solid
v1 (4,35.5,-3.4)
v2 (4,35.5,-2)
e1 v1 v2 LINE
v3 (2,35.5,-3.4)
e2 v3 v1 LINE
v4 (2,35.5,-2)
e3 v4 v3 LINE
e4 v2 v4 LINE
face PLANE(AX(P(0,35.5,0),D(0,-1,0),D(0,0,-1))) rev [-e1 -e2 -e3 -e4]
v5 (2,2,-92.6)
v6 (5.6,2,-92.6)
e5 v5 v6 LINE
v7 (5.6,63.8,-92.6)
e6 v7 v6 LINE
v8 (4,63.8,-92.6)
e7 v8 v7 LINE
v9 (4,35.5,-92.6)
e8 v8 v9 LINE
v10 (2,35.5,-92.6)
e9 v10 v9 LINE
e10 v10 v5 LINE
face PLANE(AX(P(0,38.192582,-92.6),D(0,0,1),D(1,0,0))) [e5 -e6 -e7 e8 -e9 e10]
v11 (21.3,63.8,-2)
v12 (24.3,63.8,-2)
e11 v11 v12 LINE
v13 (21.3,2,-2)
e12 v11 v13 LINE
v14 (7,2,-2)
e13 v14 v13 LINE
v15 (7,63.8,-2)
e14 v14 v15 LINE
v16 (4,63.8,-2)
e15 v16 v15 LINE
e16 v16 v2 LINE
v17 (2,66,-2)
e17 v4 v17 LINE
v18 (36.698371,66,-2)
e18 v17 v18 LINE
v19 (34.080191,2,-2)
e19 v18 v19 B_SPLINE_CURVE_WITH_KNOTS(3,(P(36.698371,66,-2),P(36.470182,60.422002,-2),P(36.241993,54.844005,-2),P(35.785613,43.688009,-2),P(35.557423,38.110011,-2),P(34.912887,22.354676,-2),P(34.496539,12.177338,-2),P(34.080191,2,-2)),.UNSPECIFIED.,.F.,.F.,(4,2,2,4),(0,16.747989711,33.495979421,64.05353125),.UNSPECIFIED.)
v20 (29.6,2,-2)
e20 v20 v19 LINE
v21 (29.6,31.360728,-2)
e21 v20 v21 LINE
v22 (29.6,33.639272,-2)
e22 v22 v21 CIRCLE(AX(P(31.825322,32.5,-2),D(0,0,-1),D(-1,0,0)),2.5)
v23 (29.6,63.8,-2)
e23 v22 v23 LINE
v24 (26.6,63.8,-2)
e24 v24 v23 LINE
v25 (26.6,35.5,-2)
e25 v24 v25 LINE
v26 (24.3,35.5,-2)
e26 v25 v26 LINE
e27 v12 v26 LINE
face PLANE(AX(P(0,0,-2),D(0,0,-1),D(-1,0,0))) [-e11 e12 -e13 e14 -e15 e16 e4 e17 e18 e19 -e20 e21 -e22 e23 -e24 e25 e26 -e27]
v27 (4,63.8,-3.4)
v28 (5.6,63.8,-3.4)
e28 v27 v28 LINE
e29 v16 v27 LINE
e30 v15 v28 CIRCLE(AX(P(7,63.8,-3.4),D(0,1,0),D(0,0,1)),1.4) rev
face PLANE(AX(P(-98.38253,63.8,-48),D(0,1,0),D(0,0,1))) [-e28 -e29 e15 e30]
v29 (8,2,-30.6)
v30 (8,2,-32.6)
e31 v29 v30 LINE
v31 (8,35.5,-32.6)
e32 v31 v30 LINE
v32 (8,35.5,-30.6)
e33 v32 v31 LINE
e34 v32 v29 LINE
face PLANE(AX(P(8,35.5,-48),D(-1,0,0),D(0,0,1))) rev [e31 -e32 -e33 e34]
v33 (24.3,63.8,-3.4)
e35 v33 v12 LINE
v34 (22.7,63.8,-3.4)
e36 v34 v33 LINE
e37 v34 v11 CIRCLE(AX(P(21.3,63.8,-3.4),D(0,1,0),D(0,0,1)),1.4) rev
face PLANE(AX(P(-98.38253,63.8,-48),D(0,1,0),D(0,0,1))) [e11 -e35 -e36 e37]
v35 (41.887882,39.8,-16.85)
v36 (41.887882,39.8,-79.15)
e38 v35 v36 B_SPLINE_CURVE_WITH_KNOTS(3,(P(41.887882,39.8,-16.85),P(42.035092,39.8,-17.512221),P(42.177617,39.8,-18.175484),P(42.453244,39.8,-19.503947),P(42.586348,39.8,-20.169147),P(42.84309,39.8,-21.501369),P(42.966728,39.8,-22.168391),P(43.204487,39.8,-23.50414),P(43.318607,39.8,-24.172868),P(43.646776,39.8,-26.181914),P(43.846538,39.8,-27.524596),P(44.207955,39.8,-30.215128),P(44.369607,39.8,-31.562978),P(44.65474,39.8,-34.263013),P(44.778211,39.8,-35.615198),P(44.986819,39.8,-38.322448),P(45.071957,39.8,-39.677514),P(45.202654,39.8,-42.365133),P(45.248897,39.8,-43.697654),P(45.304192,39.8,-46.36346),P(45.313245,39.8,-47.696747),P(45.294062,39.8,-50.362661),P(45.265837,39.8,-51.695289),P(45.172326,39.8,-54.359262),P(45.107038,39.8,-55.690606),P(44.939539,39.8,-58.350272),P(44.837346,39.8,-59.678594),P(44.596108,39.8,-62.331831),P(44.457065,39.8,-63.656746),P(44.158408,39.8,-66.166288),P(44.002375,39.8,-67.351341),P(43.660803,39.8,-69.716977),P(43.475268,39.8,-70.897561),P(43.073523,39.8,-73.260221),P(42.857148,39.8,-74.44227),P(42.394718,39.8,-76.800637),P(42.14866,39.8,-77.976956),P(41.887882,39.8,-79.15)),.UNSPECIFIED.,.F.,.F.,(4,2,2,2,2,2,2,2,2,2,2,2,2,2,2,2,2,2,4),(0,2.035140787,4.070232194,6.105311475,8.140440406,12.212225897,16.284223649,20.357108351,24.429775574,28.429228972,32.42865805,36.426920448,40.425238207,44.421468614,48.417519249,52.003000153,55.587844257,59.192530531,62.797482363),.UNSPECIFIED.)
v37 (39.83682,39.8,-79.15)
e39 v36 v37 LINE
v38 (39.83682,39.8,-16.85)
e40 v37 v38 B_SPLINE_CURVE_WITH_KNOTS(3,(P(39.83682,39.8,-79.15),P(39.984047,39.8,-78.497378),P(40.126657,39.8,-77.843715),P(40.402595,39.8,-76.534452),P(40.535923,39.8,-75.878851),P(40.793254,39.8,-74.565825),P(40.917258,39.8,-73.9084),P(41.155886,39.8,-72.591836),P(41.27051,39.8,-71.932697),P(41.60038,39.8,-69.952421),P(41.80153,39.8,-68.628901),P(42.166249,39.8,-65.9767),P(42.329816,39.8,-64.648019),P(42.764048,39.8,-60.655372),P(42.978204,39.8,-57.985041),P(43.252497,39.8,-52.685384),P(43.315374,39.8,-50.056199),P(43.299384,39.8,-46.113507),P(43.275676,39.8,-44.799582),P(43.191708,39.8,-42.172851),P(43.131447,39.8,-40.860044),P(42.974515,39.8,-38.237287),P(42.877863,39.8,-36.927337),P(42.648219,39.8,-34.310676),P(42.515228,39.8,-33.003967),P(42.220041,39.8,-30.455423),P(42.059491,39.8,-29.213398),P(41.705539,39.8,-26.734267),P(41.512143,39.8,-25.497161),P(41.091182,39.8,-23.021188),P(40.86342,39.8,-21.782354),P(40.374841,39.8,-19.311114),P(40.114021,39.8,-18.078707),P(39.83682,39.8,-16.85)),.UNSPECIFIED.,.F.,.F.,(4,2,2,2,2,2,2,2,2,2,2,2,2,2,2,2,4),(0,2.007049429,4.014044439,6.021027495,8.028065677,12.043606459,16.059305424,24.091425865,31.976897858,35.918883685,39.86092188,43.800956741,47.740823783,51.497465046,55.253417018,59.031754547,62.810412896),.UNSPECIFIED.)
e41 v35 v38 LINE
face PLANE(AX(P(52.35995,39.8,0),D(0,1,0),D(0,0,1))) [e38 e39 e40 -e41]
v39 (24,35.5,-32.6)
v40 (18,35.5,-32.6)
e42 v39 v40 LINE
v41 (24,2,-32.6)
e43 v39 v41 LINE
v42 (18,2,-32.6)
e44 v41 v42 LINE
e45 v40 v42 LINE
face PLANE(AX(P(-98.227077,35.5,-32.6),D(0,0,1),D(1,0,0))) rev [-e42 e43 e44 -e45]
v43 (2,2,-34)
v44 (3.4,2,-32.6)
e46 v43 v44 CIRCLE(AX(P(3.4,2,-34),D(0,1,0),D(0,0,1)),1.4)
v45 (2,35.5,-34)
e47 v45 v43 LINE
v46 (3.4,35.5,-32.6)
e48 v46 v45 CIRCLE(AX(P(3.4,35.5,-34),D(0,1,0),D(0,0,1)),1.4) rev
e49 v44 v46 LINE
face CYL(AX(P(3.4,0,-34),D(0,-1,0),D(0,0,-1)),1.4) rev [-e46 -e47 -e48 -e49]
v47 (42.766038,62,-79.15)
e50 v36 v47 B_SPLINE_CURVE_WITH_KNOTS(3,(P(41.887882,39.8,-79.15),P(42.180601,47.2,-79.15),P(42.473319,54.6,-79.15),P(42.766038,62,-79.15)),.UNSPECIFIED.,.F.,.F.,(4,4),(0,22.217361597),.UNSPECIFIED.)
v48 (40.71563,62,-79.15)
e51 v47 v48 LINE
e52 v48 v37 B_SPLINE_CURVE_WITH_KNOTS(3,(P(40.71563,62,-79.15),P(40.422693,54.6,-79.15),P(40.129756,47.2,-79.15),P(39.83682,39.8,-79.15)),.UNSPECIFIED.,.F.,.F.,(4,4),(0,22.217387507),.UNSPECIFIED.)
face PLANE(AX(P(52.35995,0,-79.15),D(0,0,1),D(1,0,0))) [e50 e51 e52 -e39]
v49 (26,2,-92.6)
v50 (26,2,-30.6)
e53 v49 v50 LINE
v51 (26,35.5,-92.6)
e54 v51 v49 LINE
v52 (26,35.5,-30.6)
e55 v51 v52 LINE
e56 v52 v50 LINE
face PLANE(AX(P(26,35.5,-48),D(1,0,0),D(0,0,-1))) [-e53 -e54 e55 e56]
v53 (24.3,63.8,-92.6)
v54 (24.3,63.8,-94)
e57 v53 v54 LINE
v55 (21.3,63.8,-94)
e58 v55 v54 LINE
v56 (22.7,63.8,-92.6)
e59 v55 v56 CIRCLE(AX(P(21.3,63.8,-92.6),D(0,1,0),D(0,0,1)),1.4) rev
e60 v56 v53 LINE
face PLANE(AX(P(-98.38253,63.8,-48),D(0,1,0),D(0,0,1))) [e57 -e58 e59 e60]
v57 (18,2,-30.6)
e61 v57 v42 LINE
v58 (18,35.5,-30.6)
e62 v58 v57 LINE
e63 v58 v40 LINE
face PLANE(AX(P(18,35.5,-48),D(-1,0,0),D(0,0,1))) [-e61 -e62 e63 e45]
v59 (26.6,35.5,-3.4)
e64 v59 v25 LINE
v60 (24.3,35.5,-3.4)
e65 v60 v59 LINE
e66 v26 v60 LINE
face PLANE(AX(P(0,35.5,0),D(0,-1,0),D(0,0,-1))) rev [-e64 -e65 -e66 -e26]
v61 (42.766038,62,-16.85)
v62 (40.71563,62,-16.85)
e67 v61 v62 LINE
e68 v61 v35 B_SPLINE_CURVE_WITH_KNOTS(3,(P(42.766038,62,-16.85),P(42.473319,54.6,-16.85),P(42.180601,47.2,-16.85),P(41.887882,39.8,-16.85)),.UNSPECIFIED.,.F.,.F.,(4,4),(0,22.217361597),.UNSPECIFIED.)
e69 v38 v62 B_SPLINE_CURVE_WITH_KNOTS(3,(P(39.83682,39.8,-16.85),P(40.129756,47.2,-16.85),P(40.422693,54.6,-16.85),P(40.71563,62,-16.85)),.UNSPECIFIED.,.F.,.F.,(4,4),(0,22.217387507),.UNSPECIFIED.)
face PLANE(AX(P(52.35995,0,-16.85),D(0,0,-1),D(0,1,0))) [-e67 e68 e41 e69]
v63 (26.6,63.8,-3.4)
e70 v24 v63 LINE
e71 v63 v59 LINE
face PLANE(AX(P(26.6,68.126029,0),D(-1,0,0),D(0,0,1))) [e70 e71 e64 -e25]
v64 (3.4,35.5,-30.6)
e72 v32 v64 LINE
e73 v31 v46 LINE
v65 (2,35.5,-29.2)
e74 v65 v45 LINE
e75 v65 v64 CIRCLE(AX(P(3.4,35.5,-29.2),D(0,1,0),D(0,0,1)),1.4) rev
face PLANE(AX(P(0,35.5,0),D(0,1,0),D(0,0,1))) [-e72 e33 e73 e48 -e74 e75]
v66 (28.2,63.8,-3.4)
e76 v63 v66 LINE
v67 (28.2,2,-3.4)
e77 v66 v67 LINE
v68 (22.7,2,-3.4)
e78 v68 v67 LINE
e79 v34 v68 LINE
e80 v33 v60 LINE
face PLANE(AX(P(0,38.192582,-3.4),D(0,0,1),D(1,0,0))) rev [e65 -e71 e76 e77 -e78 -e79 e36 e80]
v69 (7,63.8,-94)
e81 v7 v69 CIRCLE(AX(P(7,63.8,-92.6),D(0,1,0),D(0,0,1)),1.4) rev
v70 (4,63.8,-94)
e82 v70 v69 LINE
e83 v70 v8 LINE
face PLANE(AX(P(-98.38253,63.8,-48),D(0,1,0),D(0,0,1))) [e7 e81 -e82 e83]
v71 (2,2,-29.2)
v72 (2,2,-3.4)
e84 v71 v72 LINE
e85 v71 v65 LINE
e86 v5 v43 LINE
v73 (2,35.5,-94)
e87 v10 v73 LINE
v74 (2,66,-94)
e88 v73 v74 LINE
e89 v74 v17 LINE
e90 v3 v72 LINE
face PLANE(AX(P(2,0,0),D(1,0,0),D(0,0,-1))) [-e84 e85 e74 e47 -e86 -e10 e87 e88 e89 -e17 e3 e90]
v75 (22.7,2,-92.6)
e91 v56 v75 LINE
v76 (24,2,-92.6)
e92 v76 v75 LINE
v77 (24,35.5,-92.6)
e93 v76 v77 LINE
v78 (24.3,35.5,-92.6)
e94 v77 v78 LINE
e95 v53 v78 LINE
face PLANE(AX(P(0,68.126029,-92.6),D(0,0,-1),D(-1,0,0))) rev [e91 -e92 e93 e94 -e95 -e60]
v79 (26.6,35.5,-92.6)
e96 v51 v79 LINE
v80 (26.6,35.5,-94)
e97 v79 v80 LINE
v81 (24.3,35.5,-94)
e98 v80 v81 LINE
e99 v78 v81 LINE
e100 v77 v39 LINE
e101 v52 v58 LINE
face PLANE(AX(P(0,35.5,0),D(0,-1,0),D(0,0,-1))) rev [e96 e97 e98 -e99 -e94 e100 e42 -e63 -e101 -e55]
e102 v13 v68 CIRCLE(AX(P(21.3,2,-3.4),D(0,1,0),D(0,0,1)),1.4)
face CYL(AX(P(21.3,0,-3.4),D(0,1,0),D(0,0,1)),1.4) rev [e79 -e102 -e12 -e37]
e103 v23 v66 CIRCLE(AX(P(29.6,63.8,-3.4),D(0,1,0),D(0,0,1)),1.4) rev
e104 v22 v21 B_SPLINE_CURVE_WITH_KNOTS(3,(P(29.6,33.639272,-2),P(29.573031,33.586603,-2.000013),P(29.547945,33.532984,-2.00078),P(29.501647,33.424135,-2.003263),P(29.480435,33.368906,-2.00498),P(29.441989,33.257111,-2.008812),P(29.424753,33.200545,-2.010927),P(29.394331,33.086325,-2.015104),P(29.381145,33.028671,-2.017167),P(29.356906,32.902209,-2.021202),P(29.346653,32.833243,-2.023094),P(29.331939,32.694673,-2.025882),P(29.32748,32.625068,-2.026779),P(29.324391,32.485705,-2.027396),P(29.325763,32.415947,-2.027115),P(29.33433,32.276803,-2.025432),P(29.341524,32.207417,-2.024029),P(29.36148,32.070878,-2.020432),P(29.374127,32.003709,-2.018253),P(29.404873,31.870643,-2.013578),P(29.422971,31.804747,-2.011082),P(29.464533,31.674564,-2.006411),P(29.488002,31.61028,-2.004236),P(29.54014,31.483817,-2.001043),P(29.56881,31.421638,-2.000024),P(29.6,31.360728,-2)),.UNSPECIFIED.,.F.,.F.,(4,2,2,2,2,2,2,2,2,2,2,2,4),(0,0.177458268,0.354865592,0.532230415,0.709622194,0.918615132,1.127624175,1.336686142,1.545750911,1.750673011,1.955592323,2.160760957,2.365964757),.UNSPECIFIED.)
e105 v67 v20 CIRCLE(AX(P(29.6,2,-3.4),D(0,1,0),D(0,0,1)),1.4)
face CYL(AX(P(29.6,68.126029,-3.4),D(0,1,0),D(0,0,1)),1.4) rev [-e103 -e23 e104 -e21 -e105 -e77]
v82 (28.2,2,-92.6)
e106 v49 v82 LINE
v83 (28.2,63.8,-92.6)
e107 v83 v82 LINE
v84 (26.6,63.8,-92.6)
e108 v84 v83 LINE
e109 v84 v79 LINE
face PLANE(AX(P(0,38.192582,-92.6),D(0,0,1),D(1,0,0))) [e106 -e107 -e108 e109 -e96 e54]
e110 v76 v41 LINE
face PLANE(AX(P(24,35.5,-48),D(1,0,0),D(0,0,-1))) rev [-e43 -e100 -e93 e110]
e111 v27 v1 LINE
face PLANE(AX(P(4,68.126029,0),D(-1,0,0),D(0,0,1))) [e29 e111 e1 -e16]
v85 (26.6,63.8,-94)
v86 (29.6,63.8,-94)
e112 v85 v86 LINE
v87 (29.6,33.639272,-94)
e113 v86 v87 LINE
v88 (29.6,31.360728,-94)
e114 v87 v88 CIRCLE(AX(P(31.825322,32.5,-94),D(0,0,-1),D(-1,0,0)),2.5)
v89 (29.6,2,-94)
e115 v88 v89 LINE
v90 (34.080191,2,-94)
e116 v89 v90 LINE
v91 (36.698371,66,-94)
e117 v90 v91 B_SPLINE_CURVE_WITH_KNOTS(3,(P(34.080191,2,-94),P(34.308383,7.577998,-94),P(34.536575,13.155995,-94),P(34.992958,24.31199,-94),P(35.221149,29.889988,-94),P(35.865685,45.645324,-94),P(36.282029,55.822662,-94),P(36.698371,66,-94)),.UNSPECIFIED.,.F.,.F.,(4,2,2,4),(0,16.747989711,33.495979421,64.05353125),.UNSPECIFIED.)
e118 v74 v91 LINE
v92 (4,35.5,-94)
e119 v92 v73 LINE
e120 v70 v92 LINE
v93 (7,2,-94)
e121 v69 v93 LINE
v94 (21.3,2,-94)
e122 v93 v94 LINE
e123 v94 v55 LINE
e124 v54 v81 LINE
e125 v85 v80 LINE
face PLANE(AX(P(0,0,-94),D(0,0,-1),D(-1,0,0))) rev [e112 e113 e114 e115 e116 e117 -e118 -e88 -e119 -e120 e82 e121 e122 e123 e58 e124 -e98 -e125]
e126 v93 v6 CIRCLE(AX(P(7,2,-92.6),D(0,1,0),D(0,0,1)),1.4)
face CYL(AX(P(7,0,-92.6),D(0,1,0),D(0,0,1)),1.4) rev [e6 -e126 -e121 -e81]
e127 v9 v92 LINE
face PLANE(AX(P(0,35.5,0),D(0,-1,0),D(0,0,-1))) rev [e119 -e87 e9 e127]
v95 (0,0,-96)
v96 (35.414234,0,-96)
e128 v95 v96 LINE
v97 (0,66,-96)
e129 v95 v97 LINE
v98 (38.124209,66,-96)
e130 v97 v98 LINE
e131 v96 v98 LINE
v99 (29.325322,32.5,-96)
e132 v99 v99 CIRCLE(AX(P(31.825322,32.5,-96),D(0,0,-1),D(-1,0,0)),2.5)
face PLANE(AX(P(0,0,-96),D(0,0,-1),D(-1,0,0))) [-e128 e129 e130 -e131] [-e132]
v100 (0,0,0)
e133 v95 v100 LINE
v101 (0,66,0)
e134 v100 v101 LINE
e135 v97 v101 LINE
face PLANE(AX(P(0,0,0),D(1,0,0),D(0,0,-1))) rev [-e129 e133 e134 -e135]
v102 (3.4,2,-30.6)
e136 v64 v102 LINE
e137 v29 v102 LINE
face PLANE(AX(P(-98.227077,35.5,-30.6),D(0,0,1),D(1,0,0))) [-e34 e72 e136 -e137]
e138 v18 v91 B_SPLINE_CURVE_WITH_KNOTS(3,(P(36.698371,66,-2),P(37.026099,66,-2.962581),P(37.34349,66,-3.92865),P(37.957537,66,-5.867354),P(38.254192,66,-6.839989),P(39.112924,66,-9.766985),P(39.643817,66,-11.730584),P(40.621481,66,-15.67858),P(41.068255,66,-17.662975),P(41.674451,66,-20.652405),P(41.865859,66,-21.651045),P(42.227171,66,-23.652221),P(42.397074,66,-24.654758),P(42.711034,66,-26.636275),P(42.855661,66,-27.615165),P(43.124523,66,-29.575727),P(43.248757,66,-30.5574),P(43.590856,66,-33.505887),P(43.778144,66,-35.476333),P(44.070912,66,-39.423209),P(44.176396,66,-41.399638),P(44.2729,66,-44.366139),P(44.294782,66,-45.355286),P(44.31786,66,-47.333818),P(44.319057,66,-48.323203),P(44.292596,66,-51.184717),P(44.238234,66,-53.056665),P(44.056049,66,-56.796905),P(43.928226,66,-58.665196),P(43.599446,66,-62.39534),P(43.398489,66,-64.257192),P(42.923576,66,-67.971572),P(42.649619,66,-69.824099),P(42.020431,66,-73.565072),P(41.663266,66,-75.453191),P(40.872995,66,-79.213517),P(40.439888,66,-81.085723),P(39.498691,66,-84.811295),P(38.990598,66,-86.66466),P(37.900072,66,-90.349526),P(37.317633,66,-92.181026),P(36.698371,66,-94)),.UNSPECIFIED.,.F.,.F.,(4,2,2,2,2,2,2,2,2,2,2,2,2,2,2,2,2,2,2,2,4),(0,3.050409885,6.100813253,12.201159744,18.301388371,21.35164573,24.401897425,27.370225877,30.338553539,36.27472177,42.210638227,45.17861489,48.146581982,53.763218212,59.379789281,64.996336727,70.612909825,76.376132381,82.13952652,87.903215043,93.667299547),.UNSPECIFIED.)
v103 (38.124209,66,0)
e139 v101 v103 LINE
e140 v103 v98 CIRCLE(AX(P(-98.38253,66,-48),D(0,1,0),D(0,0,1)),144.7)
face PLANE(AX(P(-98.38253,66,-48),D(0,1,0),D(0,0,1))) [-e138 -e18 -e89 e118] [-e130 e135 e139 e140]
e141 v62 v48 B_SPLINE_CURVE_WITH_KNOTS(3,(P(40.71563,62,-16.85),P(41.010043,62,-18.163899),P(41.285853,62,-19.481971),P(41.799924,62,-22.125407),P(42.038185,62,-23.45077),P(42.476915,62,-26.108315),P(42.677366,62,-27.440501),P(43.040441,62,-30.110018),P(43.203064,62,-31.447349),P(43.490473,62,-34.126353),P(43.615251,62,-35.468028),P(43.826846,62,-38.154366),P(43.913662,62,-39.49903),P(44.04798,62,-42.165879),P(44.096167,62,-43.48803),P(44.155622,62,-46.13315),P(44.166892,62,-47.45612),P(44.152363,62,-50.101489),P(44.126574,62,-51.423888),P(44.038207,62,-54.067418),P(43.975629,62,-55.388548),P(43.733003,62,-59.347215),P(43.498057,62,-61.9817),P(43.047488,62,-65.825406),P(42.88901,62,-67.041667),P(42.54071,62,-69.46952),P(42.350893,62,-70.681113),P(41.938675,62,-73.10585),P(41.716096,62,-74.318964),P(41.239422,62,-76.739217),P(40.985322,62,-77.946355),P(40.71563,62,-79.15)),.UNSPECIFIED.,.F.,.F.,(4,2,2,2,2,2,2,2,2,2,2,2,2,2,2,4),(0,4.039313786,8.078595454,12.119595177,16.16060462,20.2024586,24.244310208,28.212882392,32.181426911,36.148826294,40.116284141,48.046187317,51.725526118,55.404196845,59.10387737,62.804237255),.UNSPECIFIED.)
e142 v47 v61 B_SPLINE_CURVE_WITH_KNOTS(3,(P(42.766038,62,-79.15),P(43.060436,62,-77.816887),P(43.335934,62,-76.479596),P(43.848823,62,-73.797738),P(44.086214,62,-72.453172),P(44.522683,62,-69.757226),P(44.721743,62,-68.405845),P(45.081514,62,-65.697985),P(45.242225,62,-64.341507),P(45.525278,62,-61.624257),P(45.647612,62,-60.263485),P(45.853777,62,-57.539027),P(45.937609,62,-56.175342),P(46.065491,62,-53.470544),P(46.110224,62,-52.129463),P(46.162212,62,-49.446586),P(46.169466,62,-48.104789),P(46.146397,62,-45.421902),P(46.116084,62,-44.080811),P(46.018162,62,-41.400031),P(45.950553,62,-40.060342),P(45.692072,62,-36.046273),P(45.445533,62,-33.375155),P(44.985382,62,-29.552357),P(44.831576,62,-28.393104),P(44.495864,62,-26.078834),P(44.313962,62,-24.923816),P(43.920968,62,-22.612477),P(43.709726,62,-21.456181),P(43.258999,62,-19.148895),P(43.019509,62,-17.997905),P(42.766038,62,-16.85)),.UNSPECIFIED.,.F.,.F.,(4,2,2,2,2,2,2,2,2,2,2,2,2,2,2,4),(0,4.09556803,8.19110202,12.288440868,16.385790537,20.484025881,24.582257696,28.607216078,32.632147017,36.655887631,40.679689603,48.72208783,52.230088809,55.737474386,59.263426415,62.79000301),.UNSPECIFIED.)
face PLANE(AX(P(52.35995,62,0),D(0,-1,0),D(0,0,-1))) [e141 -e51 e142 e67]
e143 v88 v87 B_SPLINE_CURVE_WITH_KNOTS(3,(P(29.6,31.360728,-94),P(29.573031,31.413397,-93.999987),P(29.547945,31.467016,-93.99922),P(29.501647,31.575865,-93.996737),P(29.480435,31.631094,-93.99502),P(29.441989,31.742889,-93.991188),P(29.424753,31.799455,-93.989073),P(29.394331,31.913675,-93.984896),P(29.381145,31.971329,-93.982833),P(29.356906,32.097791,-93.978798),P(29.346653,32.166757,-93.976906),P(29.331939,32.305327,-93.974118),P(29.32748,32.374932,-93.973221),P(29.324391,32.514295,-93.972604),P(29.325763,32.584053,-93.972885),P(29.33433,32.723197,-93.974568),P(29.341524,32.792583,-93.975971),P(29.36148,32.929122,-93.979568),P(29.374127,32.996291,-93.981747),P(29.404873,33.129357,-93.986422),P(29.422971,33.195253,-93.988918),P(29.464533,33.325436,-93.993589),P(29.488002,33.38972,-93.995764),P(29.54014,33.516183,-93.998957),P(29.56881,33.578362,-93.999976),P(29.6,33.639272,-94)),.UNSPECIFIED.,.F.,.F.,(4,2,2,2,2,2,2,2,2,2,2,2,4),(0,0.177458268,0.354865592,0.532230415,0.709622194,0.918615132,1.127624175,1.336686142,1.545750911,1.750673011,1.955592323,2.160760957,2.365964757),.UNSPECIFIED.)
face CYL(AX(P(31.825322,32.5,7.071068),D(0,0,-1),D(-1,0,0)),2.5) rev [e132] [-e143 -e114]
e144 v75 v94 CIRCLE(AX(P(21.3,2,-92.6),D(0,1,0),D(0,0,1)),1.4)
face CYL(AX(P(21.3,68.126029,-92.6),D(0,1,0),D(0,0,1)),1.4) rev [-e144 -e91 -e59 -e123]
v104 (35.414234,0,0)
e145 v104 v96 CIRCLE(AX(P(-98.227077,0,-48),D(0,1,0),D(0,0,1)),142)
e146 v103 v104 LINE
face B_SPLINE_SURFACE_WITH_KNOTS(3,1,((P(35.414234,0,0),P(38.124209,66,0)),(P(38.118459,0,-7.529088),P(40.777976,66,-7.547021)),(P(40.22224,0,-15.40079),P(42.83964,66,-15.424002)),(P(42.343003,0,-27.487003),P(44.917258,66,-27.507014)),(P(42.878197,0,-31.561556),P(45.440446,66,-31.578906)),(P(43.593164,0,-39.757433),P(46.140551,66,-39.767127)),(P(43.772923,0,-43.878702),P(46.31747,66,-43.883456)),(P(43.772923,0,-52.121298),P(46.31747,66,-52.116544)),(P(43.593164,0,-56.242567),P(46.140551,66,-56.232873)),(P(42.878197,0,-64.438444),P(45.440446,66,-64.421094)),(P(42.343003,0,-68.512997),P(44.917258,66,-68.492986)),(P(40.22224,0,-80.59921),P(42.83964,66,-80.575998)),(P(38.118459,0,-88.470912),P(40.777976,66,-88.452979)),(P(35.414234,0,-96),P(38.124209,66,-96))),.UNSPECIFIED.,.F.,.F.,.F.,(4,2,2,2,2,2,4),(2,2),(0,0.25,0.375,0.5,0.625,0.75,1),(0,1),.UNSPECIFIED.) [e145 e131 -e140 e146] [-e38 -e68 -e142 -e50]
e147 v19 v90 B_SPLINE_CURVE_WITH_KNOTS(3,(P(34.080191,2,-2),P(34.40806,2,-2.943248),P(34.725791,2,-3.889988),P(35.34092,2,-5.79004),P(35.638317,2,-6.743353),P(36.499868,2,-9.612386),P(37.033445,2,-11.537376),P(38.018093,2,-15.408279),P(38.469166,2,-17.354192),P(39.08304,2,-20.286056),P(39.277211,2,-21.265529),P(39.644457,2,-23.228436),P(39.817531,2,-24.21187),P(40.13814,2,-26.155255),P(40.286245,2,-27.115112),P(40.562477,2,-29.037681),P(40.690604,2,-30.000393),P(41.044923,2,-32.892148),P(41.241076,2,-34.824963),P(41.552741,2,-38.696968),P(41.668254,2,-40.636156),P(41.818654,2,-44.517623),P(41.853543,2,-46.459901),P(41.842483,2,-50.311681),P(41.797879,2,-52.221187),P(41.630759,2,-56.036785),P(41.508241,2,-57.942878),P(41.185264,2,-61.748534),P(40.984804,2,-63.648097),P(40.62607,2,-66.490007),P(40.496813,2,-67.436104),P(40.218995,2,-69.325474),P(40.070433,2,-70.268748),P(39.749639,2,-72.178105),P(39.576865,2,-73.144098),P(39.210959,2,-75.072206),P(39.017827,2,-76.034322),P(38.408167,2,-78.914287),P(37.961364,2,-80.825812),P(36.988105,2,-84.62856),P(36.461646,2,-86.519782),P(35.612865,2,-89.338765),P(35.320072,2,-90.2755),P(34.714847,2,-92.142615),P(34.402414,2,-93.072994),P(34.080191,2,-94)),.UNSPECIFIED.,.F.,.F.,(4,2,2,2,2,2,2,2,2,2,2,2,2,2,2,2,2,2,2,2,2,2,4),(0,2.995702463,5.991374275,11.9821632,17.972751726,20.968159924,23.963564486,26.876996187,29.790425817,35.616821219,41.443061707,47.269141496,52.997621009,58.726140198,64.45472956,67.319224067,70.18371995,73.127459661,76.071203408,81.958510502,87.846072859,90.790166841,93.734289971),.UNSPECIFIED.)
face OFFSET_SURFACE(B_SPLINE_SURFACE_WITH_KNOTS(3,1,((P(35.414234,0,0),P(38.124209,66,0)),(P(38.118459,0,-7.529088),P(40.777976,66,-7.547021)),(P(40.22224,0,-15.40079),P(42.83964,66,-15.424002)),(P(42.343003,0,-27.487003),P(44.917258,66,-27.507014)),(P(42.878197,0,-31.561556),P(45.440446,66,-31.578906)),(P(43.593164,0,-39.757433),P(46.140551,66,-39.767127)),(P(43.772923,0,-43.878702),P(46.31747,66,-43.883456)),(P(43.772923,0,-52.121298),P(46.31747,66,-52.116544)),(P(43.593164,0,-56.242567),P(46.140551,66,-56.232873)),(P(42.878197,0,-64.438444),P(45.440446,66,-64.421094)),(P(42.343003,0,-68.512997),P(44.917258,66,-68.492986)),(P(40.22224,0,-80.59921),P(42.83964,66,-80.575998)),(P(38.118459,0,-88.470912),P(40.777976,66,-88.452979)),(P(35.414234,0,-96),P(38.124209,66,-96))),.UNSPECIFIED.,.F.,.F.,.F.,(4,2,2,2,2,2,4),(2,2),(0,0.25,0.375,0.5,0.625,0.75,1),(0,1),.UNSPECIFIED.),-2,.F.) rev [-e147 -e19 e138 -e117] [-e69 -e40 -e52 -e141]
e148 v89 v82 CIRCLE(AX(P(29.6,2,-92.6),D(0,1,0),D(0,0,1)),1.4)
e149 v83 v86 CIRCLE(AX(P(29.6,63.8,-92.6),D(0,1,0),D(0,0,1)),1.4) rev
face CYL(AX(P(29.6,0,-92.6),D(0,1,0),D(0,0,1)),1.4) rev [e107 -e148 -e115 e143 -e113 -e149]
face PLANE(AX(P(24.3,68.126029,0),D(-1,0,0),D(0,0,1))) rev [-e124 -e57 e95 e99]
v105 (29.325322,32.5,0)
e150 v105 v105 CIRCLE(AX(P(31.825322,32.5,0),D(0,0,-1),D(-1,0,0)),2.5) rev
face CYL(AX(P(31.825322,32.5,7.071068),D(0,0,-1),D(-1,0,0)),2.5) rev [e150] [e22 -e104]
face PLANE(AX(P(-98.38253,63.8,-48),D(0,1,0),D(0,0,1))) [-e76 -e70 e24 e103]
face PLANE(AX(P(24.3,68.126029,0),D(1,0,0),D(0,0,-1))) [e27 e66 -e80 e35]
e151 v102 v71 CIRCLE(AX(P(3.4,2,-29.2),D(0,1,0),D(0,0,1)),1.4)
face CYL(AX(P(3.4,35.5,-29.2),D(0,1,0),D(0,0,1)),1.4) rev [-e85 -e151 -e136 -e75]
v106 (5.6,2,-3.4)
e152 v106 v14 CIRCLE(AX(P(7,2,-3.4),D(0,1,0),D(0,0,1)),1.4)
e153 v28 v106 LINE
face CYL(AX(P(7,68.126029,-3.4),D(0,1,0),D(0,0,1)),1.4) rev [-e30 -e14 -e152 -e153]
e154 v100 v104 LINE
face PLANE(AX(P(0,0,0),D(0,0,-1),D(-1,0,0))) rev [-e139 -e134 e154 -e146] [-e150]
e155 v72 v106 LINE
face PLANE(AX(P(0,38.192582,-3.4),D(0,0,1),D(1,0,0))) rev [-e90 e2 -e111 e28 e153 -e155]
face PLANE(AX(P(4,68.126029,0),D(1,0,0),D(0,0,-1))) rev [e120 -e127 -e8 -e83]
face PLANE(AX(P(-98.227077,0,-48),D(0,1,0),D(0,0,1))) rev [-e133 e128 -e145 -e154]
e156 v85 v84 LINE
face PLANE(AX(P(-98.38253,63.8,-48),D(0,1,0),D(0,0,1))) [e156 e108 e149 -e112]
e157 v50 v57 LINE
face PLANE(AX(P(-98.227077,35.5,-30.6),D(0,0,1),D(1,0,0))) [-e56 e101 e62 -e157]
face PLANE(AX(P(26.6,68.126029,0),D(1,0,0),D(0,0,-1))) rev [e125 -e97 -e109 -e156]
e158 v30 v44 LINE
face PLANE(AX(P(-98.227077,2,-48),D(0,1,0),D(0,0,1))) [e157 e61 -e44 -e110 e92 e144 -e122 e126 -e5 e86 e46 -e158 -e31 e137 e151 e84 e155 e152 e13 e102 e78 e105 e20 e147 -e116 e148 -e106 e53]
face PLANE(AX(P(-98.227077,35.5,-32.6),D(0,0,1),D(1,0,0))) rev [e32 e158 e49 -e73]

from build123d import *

# Parameters (mm, degrees)
SHELL1_T               = -2
BOSS_EXTRUDE1_START    = 2
SKETCH7_6_W            = 6
SKETCH7_6_H            = 2
BOSS_EXTRUDE1_DEPTH    = 33.5
SKETCH7_9_W            = 2
SKETCH7_9_H            = 1.4
SKETCH7_9_W_2          = 2.3
SKETCH7_9_W_3          = 0.6
BOSS_EXTRUDE3_DEPTH    = 35.5
SKETCH7_8_W            = 1.6
SKETCH7_8_H            = 1.4
SKETCH7_8_W_2          = 1.3
SKETCH7_8_W_3          = 0.3
BOSS_EXTRUDE2_DEPTH    = 63.8
FILLET1_R              = 1.4
CUT_EXTRUDE1_START     = -46.163243618
CUT_EXTRUDE1_OUTLINE_W = 62.3
CUT_EXTRUDE1_OUTLINE_H = 22.2
CUT_EXTRUDE1_DEPTH     = 6.326424063
CUT_EXTRUDE2_START     = -2
SKETCH11_R             = 2.5
CUT_EXTRUDE2_DEPTH     = 96


# Read off the part's stored shape, not the designer's step: Cut-Extrude1
with BuildPart() as part:
    # Sketch7 → Loft1 section 0
    with BuildSketch(Plane(origin=(0, 0, 0), x_dir=(1, 0, 0), z_dir=(0, 1, 0))):
        with BuildLine():
            Line((0, 96), (35.41423357, 96))
            ThreePointArc((35.41423357, 96), (43.772922591, 48), (35.41423357, 0))
            Line((35.41423357, 0), (0, 0))
            Line((0, 0), (0, 96))
        make_face()
    # Sketch9 → Loft1 section 1
    with BuildSketch(Plane(origin=(0, 66, 0), x_dir=(1, 0, 0), z_dir=(0, 1, 0))):
        with BuildLine():
            Line((0, 96), (38.124209432, 96))
            ThreePointArc((38.124209432, 96), (46.317469671, 48), (38.124209432, 0))
            Line((38.124209432, 0), (0, 0))
            Line((0, 0), (0, 96))
        make_face()
    loft()

    # Shell1
    shell1_openings = [part.faces().sort_by_distance(p)[0] for p in [
        (21.876860879, 66, -48),
    ]]
    offset(amount=SHELL1_T, openings=shell1_openings, kind=Kind.INTERSECTION)

    # Sketch7<6> → Boss-Extrude1 (add)
    with BuildSketch(Plane(origin=(0, 0, 0), x_dir=(1, 0, 0), z_dir=(0, 1, 0)).offset(BOSS_EXTRUDE1_START)):
        with Locations((5, 31.6)):
            Rectangle(SKETCH7_6_W, SKETCH7_6_H)
        Polygon((18, 32.6), (18, 30.6), (26, 30.6), (26, 94), (24, 94), (24, 32.6), align=None)
    extrude(amount=BOSS_EXTRUDE1_DEPTH)

    # Sketch7<9> → Boss-Extrude3 (add)
    with BuildSketch(Plane(origin=(0, 0, 0), x_dir=(1, 0, 0), z_dir=(0, 1, 0))):
        with Locations((3, 2.7)):
            Rectangle(SKETCH7_9_W, SKETCH7_9_H)
        with Locations((25.45, 2.7)):
            Rectangle(SKETCH7_9_W_2, SKETCH7_9_H)
        with Locations((3, 93.3)):
            Rectangle(SKETCH7_9_W, SKETCH7_9_H)
        with Locations((26.3, 93.3)):
            Rectangle(SKETCH7_9_W_3, SKETCH7_9_H)
    extrude(amount=BOSS_EXTRUDE3_DEPTH)

    # Sketch7<8> → Boss-Extrude2 (add)
    with BuildSketch(Plane(origin=(0, 0, 0), x_dir=(1, 0, 0), z_dir=(0, 1, 0))):
        with Locations((4.8, 2.7)):
            Rectangle(SKETCH7_8_W, SKETCH7_8_H)
        with Locations((27.4, 2.7)):
            Rectangle(SKETCH7_8_W, SKETCH7_8_H)
        with Locations((23.5, 2.7)):
            Rectangle(SKETCH7_8_W, SKETCH7_8_H)
        with Locations((4.8, 93.3)):
            Rectangle(SKETCH7_8_W, SKETCH7_8_H)
        with Locations((27.4, 93.3)):
            Rectangle(SKETCH7_8_W, SKETCH7_8_H)
        with Locations((23.35, 93.3)):
            Rectangle(SKETCH7_8_W_2, SKETCH7_8_H)
        with Locations((24.15, 93.3)):
            Rectangle(SKETCH7_8_W_3, SKETCH7_8_H)
    extrude(amount=BOSS_EXTRUDE2_DEPTH)

    # Fillet1
    fillet1_edges = [part.edges().sort_by_distance(p)[0] for p in [
        (22.7, 32.9, -94),
        (28.2, 32.9, -94),
        (5.6, 32.9, -94),
        (2, 18.75, -32.6),
        (2, 18.75, -30.6),
        (5.6, 32.9, -2),
        (22.7, 32.9, -2),
        (28.2, 32.9, -2),
    ]]
    fillet(fillet1_edges, radius=FILLET1_R - 0.0001)  # a hair under: the kernel refuses the full size

    # Cut-Extrude1 outline → Cut-Extrude1 (cut)
    with BuildSketch(Plane.ZY.offset(CUT_EXTRUDE1_START)):
        with Locations((-48, 50.9)):
            Rectangle(CUT_EXTRUDE1_OUTLINE_W, CUT_EXTRUDE1_OUTLINE_H)
    extrude(amount=CUT_EXTRUDE1_DEPTH, mode=Mode.SUBTRACT)

    # Sketch11 → Cut-Extrude2 (cut)
    with BuildSketch(Plane.XY.offset(-94).offset(CUT_EXTRUDE2_START)):
        with Locations(Location((31.825322124, 32.5, 0), (0, 0, 180))):
            Circle(SKETCH11_R)
    extrude(amount=CUT_EXTRUDE2_DEPTH, mode=Mode.SUBTRACT)


solid = part.part
